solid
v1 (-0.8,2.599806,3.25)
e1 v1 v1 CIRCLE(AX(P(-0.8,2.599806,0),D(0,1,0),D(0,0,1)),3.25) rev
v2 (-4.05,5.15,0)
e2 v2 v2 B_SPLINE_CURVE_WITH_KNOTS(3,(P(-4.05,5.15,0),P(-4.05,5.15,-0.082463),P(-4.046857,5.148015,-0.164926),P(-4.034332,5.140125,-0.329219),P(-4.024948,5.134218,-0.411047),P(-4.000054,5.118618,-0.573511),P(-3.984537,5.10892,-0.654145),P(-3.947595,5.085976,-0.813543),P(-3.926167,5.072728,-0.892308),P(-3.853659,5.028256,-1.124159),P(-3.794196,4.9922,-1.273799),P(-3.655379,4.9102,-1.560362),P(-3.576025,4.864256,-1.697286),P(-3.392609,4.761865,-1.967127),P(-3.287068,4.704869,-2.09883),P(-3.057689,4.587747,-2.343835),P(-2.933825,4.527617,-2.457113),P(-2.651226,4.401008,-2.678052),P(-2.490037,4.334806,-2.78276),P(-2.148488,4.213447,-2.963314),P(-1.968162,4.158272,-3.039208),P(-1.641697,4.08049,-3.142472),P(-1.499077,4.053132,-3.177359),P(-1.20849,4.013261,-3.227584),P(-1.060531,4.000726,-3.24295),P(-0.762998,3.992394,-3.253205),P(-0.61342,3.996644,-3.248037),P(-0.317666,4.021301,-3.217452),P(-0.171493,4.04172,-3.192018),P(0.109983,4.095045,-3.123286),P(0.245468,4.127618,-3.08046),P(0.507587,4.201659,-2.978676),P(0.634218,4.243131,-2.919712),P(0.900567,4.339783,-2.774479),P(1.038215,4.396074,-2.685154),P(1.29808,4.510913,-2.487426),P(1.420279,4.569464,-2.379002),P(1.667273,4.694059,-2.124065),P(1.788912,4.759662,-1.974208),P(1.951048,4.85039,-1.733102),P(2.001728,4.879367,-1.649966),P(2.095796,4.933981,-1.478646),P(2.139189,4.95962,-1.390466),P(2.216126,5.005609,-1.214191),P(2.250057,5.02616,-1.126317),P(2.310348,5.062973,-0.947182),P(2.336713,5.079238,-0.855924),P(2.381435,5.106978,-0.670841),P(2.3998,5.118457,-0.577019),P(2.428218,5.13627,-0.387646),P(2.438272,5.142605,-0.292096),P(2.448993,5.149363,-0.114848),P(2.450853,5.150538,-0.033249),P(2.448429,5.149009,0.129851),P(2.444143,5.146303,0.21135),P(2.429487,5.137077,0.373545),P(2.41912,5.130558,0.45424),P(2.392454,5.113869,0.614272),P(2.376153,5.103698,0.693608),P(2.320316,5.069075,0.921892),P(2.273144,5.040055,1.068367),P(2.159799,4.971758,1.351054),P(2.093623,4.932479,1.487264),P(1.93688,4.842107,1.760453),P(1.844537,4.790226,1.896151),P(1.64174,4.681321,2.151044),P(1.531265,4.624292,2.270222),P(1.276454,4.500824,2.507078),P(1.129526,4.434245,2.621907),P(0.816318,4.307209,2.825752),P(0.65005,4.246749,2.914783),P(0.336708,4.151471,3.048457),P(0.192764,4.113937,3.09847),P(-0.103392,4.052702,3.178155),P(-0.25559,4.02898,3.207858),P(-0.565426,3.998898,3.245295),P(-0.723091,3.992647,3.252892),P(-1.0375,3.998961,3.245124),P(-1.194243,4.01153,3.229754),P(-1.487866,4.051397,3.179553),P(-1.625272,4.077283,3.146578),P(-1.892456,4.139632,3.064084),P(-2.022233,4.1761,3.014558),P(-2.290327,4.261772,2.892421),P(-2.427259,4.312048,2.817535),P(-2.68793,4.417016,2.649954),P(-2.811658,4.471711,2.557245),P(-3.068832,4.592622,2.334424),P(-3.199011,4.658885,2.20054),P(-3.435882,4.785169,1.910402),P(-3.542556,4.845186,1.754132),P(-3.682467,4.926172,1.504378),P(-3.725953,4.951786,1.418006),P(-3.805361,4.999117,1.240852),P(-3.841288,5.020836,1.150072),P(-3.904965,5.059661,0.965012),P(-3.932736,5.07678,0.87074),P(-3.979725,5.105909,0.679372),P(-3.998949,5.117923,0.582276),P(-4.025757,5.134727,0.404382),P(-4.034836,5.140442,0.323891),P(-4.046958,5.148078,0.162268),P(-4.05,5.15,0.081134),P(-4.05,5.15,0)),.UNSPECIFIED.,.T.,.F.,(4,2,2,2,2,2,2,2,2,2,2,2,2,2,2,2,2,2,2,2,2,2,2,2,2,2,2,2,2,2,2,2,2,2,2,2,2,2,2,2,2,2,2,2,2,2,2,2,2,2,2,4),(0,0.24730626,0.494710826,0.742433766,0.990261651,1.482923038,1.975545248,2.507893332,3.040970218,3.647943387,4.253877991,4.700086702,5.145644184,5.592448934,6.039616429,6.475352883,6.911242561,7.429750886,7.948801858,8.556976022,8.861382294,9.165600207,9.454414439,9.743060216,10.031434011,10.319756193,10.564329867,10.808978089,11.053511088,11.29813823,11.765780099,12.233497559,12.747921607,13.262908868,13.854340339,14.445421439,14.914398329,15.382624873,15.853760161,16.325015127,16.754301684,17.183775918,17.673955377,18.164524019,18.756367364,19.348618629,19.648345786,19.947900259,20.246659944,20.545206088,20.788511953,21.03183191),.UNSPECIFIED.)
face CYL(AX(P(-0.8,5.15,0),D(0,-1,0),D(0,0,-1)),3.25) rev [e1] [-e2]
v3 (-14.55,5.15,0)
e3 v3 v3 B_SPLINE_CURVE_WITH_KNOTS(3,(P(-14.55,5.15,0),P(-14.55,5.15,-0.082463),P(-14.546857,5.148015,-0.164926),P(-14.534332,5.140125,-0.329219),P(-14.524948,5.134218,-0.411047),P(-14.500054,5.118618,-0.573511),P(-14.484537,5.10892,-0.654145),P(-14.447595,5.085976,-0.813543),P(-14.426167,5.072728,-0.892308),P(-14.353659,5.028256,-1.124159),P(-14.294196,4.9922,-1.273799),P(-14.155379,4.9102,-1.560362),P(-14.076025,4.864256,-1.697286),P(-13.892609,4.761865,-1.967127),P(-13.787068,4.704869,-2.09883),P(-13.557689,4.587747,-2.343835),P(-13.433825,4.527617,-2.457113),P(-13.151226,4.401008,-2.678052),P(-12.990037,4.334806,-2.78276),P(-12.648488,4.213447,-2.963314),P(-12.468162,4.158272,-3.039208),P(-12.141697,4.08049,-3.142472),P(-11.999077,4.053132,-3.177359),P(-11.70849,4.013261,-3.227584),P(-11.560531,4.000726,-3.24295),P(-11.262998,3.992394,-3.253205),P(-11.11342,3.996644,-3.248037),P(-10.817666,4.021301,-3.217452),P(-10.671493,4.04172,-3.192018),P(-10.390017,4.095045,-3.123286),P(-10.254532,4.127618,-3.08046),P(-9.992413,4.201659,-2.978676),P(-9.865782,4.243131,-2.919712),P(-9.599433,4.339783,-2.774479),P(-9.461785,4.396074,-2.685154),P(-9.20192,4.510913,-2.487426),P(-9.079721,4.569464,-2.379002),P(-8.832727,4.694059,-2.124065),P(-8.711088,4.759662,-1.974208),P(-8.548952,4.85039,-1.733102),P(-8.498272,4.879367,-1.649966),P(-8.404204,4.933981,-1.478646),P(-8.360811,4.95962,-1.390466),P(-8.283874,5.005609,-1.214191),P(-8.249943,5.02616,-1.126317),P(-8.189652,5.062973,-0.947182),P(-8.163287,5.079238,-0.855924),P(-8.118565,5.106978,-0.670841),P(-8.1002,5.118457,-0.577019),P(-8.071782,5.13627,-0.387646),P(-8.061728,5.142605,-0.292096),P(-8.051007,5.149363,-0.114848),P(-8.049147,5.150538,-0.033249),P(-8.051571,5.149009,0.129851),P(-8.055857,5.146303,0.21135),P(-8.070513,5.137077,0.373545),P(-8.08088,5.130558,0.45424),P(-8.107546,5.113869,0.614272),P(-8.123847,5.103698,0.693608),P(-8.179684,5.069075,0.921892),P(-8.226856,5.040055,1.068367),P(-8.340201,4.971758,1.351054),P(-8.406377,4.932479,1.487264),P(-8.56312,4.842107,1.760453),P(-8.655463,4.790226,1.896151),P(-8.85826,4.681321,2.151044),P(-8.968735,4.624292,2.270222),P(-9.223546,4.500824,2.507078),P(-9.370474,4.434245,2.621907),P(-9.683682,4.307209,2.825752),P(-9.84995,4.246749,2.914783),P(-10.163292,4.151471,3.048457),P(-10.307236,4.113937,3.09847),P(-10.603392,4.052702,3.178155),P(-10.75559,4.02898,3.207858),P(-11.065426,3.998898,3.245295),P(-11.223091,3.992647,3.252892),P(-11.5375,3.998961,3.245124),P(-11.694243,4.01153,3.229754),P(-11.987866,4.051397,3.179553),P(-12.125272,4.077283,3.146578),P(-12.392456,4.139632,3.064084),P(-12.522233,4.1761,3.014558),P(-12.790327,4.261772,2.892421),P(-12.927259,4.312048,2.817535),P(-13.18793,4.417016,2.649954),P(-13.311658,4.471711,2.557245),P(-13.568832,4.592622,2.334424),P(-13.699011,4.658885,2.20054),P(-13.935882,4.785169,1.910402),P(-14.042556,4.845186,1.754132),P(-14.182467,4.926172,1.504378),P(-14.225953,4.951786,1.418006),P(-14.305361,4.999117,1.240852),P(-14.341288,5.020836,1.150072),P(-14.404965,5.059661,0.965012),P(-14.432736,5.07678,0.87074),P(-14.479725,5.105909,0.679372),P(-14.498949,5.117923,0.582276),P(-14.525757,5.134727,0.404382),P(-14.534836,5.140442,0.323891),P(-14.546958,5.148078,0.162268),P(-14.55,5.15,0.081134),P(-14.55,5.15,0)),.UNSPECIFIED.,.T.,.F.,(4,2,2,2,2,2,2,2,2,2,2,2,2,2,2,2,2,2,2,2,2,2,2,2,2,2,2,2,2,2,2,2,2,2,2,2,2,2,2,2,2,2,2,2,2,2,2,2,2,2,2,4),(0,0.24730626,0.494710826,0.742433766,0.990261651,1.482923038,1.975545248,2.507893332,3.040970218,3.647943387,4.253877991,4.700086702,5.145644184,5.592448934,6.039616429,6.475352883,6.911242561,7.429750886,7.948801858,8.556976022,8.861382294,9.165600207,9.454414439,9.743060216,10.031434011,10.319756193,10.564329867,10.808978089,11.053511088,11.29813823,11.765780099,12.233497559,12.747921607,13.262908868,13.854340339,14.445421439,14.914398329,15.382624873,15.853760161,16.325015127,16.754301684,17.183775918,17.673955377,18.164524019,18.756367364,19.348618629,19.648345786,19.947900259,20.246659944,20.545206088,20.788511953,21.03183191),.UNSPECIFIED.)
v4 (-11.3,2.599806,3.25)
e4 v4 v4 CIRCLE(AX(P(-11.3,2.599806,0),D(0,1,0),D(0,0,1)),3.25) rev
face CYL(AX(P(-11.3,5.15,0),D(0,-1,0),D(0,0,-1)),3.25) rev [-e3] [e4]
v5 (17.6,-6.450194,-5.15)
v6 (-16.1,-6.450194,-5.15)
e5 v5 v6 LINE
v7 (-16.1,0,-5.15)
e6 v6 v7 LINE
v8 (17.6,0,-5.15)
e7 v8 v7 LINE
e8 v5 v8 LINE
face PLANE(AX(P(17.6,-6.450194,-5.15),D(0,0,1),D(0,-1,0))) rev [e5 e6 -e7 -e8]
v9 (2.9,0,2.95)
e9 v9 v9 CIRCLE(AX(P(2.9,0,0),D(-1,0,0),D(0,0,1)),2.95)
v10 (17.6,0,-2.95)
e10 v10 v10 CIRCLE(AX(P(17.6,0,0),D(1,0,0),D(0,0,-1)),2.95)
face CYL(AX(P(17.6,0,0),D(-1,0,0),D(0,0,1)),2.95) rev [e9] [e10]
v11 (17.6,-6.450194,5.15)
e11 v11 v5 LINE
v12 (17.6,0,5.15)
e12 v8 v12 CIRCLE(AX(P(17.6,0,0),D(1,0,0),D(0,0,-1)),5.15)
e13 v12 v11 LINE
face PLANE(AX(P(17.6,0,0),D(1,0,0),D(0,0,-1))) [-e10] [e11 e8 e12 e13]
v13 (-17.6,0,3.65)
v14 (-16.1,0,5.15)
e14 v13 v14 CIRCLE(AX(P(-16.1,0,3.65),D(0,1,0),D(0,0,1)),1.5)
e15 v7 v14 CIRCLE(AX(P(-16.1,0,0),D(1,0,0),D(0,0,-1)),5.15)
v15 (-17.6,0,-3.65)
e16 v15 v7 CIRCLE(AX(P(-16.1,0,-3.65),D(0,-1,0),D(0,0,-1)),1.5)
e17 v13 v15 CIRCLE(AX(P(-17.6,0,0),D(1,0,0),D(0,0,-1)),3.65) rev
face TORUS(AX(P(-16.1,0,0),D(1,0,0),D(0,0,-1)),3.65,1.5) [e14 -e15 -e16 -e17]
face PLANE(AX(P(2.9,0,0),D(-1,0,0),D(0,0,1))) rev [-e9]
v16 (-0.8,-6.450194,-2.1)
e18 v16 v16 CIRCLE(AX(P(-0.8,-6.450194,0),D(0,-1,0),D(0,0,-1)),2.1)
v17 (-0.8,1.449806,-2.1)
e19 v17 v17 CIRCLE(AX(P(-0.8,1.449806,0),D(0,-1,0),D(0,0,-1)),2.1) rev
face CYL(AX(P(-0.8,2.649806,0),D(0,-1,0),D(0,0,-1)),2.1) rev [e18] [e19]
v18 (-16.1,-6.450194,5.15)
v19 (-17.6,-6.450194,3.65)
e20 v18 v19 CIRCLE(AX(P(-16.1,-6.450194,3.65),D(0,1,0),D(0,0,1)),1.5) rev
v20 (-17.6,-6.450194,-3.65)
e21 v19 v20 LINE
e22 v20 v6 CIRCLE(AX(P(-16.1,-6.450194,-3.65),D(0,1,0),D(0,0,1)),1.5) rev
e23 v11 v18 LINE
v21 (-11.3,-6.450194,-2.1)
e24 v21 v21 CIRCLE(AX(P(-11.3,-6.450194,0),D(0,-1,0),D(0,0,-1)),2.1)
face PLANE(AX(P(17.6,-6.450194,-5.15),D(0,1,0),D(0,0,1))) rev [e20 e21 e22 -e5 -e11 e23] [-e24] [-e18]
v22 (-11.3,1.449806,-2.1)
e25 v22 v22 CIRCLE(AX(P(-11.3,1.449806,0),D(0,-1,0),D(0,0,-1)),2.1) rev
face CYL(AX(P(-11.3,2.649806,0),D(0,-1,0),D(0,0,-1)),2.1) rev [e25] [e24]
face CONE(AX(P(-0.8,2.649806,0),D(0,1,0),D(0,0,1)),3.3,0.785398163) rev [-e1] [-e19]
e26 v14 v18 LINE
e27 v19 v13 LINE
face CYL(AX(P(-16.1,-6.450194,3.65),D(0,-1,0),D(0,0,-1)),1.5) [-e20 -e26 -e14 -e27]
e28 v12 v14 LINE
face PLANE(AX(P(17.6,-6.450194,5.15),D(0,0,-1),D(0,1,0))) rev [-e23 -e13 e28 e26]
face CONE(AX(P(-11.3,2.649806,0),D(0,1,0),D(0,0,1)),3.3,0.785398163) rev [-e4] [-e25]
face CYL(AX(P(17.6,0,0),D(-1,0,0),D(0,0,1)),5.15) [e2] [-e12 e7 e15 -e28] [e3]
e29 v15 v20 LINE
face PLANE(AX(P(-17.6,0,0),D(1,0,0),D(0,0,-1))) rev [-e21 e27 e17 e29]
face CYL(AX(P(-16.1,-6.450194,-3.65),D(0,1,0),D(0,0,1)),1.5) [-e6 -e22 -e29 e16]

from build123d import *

# Parameters (mm, degrees)
ESBO_O1_R                = 2.95
RESSALTO_EXTRUS_O1_DEPTH = 17.6
RESSALTO_EXTRUS_O2_START = -20.5
RESSALTO_EXTRUS_O2_DEPTH = 20.5
FILETE1_R                = 1.5
ESBO_O3_R                = 3.25
CORTE_EXTRUS_O1_DEPTH    = 22.699009104
ESBO_O5_R                = 3.25
ESBO_O5_R_2              = 2.1
RESSALTO_EXTRUS_O3_DEPTH = 9.1
CHANFRO1_SIZE            = 1.2


with BuildPart() as part:
    # Esboço1 → Ressalto-extrusão1 (new, symmetric)
    with BuildSketch(Plane(origin=(0, 0, 0), x_dir=(0, 0, -1), z_dir=(1, 0, 0))):
        with BuildLine():
            Line((5.15, -6.450193796), (-5.15, -6.450193796))
            Line((-5.15, -6.450193796), (-5.15, 0))
            ThreePointArc((-5.15, 0), (0, 5.15), (5.15, 0))
            Line((5.15, 0), (5.15, -6.450193796))
        make_face()
        Circle(ESBO_O1_R, mode=Mode.SUBTRACT)
    extrude(amount=RESSALTO_EXTRUS_O1_DEPTH, both=True)

    # Esboço2 → Ressalto-extrusão2 (add)
    with BuildSketch(Plane.ZY.offset(17.6).offset(RESSALTO_EXTRUS_O2_START)):
        with BuildLine():
            Line((-5.15, 0), (-5.15, -6.450193796))
            Line((-5.15, -6.450193796), (5.15, -6.450193796))
            Line((5.15, -6.450193796), (5.15, 0))
            ThreePointArc((5.15, 0), (0, 5.15), (-5.15, 0))
        make_face()
    extrude(amount=RESSALTO_EXTRUS_O2_DEPTH)

    # Filete1
    filete1_edges = [part.edges().sort_by_distance(p)[0] for p in [
        (-17.6, -3.225096898, -5.15),
        (-17.6, -3.225096898, 5.15),
        (-17.6, 5.15, 0),
    ]]
    fillet(filete1_edges, radius=FILETE1_R)

    # Esboço3 → Corte-extrusão1 (cut, through all)
    with BuildSketch(Plane.XZ.offset(6.450193796)):
        with Locations(Location((-11.3, 0, 0), (0, 0, 270))):
            Circle(ESBO_O3_R)
        with Locations(Location((-0.8, 0, 0), (0, 0, 270))):
            Circle(ESBO_O3_R)
    extrude(amount=-CORTE_EXTRUS_O1_DEPTH, mode=Mode.SUBTRACT)

    # Esboço5 → Ressalto-extrusão3 (add)
    # profile 1 of 2: a face of its own
    with BuildSketch(Plane.XZ.offset(6.450193796)):
        with Locations(Location((-0.8, 0, 0), (0, 0, 270))):
            Circle(ESBO_O5_R)
        with Locations(Location((-0.8, 0, 0), (0, 0, 270))):
            Circle(ESBO_O5_R_2, mode=Mode.SUBTRACT)
    # profile 2 of 2: a face of its own
    with BuildSketch(Plane.XZ.offset(6.450193796)):
        with Locations(Location((-11.3, 0, 0), (0, 0, 270))):
            Circle(ESBO_O5_R)
        with Locations(Location((-11.3, 0, 0), (0, 0, 270))):
            Circle(ESBO_O5_R_2, mode=Mode.SUBTRACT)
    extrude(amount=-RESSALTO_EXTRUS_O3_DEPTH)

    # Chanfro1
    # the kernel refuses this chamfer: 1.2 mm, written as the material it takes off along each edge
    with BuildSketch(Plane(origin=(-11.3, 2.649806204, 0), x_dir=(0, 0, -1), z_dir=(-1, 0, 0))) as chanfro1_piece_1_section:
        Polygon((2.1 + CHANFRO1_SIZE, 0), (2.1, CHANFRO1_SIZE), (2.1, 0), align=None)
    chanfro1_piece_1 = revolve(axis=Axis((-11.3, 2.649806204, 0), (0, -1, 0)), mode=Mode.PRIVATE)
    chanfro1_piece_1 = chanfro1_piece_1 & Plane(origin=(-11.3, 2.024165302, 0), x_dir=(0, 0, -1), z_dir=(0, -1, 0)) * Cylinder(3.25, 14, mode=Mode.PRIVATE)
    add(chanfro1_piece_1, mode=Mode.SUBTRACT)
    with BuildSketch(Plane(origin=(-0.8, 2.649806204, 0), x_dir=(0, 0, -1), z_dir=(-1, 0, 0))) as chanfro1_piece_2_section:
        Polygon((2.1 + CHANFRO1_SIZE, 0), (2.1, CHANFRO1_SIZE), (2.1, 0), align=None)
    chanfro1_piece_2 = revolve(axis=Axis((-0.8, 2.649806204, 0), (0, -1, 0)), mode=Mode.PRIVATE)
    chanfro1_piece_2 = chanfro1_piece_2 & Plane(origin=(-0.8, 2.024165302, 0), x_dir=(0, 0, -1), z_dir=(0, -1, 0)) * Cylinder(3.25, 14, mode=Mode.PRIVATE)
    add(chanfro1_piece_2, mode=Mode.SUBTRACT)


solid = part.part
